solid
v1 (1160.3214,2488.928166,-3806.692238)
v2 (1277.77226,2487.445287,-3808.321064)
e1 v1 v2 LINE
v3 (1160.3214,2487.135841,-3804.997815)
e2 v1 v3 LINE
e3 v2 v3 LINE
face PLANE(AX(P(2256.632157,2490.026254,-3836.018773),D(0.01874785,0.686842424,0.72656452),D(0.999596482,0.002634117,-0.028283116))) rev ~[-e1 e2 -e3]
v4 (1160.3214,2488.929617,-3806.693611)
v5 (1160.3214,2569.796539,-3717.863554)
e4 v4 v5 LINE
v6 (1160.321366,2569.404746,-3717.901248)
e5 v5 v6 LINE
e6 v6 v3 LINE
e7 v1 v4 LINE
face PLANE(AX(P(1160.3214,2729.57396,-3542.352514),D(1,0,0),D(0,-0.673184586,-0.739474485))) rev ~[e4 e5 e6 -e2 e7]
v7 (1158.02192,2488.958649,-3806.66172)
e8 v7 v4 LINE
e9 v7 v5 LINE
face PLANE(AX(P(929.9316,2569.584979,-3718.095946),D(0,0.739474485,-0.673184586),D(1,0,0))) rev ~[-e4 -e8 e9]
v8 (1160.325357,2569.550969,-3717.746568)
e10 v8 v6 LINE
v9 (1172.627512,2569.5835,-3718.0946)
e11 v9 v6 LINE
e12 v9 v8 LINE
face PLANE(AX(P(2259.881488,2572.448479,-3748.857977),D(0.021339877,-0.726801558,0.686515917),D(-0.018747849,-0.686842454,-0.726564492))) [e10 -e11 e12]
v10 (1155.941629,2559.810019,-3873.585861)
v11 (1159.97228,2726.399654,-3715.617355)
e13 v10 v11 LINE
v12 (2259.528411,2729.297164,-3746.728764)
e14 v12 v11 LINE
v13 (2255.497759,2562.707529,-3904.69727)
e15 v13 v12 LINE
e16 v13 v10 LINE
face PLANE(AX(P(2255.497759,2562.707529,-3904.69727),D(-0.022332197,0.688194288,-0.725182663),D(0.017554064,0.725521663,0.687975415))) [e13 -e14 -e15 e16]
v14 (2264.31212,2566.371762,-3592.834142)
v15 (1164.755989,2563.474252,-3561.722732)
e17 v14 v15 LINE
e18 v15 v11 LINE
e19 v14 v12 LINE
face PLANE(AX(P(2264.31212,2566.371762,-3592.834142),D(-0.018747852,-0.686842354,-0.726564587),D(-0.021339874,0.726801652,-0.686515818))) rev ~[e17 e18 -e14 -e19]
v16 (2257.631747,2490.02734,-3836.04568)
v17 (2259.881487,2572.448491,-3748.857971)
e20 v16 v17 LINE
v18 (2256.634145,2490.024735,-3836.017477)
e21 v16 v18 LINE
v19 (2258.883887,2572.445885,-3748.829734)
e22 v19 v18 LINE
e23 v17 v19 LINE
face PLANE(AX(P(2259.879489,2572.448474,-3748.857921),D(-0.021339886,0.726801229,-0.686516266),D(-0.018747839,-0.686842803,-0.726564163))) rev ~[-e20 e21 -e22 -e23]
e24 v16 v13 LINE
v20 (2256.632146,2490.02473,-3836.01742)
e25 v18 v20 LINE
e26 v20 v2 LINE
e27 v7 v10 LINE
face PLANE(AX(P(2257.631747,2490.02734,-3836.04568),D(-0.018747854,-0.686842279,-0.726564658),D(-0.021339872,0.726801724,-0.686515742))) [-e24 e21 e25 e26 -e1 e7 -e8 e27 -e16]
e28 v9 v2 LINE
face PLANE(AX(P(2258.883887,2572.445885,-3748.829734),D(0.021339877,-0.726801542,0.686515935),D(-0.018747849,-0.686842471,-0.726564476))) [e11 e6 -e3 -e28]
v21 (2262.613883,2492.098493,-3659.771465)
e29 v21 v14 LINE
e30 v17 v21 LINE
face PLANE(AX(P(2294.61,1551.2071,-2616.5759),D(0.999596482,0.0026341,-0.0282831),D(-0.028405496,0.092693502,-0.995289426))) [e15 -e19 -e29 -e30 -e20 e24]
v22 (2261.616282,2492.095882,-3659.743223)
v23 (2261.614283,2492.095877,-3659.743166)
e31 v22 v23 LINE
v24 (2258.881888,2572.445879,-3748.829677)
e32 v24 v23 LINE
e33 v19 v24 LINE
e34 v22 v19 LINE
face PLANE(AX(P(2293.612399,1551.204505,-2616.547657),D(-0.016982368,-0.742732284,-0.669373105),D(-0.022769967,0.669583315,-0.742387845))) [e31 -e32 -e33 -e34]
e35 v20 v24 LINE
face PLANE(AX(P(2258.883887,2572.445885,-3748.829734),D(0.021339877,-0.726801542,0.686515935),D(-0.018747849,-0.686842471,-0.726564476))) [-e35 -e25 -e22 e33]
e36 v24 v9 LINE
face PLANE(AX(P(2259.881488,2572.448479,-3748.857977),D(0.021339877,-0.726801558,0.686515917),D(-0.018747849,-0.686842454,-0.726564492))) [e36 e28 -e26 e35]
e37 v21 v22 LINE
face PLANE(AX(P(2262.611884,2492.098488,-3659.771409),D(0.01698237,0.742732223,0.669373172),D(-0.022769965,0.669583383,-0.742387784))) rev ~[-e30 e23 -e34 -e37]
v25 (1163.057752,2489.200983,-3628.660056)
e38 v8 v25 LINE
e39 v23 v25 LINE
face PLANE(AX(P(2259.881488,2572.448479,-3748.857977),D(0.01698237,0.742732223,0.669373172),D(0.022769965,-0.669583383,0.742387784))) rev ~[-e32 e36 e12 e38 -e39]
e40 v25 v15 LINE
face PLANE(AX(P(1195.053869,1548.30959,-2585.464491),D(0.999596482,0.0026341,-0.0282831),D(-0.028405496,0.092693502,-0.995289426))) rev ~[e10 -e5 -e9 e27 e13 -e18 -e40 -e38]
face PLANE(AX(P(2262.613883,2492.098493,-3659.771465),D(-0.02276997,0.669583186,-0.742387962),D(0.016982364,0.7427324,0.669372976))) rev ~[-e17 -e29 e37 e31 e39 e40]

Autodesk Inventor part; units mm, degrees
sketch "Sketch1" plane through (0, 0, 0) normal (0, 0, 1) x (1, 0, 0)
  line L0 (2948.6488, 634.5525) -> (2841.4489, 559.4904)
  line L1 (2841.4489, 559.4904) -> (2956.2003, 395.6085)
  line L2 (2956.2003, 395.6085) -> (3063.4001, 470.6706)
  line L3 (1051.1773, 2444.1167) -> (976.8907, 2338.0244)
  line L4 (976.8907, 2338.0244) -> (1140.7211, 2223.3091)
  line L5 (1140.7211, 2223.3091) -> (1215.0077, 2329.4014)
  line L6 (-383.8501, 3232.1868) -> (-383.8501, 3052.6308)
  arc A0 (4065.9398, -2152.4924) -> (-383.8501, 3052.6308) centre (-4485.4868, -4958.3977) ccw
  arc A1 (1051.1773, 2444.1167) -> (-383.8501, 3232.1868) centre (-3980.604, -5017.8654) ccw
  arc A2 (2948.6488, 634.5525) -> (1215.0077, 2329.4014) centre (-4152.392, -4894.9339) ccw
  arc A3 (4300.883, -1939.8955) -> (3063.4001, 470.6706) centre (-4233.2291, -4798.0297) ccw
  arc A4 (4065.9398, -2152.4924) -> (4300.883, -1939.8955) centre (3657.2708, -1464.7499) ccw
  point P0 (0, 0)
  point P1 (4065.924, -2152.4924)
  point P2 (4065.924, -2152.4924)
  dimension "d8" = 9000
  dimension "d9" = 9000
  dimension "d10" = 9000
  dimension "d11" = 9000
  dimension "d12" = 800
ref_plane "Work Plane2" through (0, 0, -7900) normal (0, 0, 1) x (1, 0, 0)
ref_plane "Work Plane1" through (0, 0, 0) normal (0, 0, 1) x (1, 0, 0)
sketch "Sketch2" plane through (0, 0, -7900) normal (0, 0, 1) x (1, 0, 0)
  arc A0 (895.257, 3171.2695) -> (-383.8658, 4018.7524) centre (-4697.1096, -3880.3569) ccw projected
  line L0 (-383.8658, 4018.7524) -> (-383.8658, 3839.1061) projected
  arc A1 (4065.924, -2152.4924) -> (-383.8658, 3839.1061) centre (-4733.9746, -4039.7614) ccw projected
  line L1 (895.257, 3171.2695) -> (830.4728, 3059.0601) projected
  line L2 (830.4728, 3059.0601) -> (1003.6891, 2959.0536) projected
  line L3 (1068.4733, 3071.2631) -> (1003.6891, 2959.0536) projected
  arc A2 (2750.1419, 1279.62) -> (1068.4733, 3071.2631) centre (-4591.4319, -3926.2703) ccw projected
  line L4 (2750.1419, 1279.62) -> (2643.8882, 1205.2246) projected
  line L5 (2643.8882, 1205.2246) -> (2759.146, 1041.7698) projected
  line L6 (2865.5448, 1116.2711) -> (2759.146, 1041.7698) projected
  arc A3 (4310.9102, -1926.005) -> (2865.5448, 1116.2711) centre (-4397.3898, -4198.7812) ccw projected
  arc A4 (4065.924, -2152.4924) -> (4310.9102, -1926.005) centre (3657.2831, -1464.7333) ccw
  point P0 (0, 0)
  dimension "d7" = 800
loft "Loft1" add profiles "Sketch1", "Sketch2"
ref_plane "Work Plane3" through (2500, 0, 0) normal (1, 0, 0) x (0, 1, 0)
sketch "Sketch3" plane through (2500, 0, 0) normal (1, 0, 0) x (0, 1, 0)
  line L0 (2569.5835, -3718.0946) -> (1551.2045, -2616.5476)
  line L1 (1551.2045, -2616.5476) -> (1738.7871, -4630.7013)
  line L2 (1738.7871, -4630.7013) -> (2569.5835, -3718.0946)
  line L3 (4228.9662, 279.606) -> (-2269.9695, 279.606)
  line L4 (-2269.9695, 279.606) -> (-2269.9695, -8192.2559)
  line L5 (-2269.9695, -8192.2559) -> (4228.9662, -8192.2559)
  line L6 (4228.9662, -8192.2559) -> (4228.9662, 279.606)
  point P0 (0, 0)
extrude "Extrusion1" cut sketch "Sketch3" along normal through all both and the other way through all
ref_plane "Work Plane4" through (1945.737, 1551.2045, -2616.5476) normal (0, -0.9956912, -0.0927309) x (1, 0, 0)
sketch "Sketch5" plane through (1945.737, 1551.2045, -2616.5476) normal (0, -0.9956912, -0.0927309) x (1, 0, 0)
  line L0 (347.8734, 0) -> (290.3896, -2022.8698)
  point P0 (-1945.737, 2749.1181)
ref_plane "Work Plane5" through (2293.6104, 1551.2045, -2616.5476) normal (-0.6425282, -0.7644369, -0.052856) x (-0.0284055, 0.0926935, -0.9952894)
sketch "Sketch6" plane through (2293.6104, 1551.2045, -2616.5476) normal (-0.6425282, -0.7644369, -0.052856) x (-0.0284055, 0.0926935, -0.9952894)
  line L0 (-1061.9028, -2252.9112) -> (2197.0944, -2252.9112)
  line L1 (2197.0944, -2252.9112) -> (2197.0944, 343.7273)
  line L2 (2197.0944, 343.7273) -> (-1061.9028, 343.7273)
  line L3 (-1061.9028, 343.7273) -> (-1061.9028, -2252.9112)
  point P0 (-2682.8576, -979.2829)
extrude "Extrusion2" cut sketch "Sketch6" against normal through all
ref_plane "Work Plane6" through (2293.6104, 1551.2045, -2616.5476) normal (-0.9995965, -0.0026341, 0.0282831) x (-0.0284055, 0.0926935, -0.9952894)
sketch "Sketch7" plane through (2293.6104, 1551.2045, -2616.5476) normal (-0.6425282, -0.7644369, -0.052856) x (-0.0284055, 0.0926935, -0.9952894)
  line L0 (0, 0) -> (1222.5973, -1418.5767) projected
  line L1 (1222.5973, -1418.5767) -> (2023.6864, 0) projected
  point P0 (-2682.8576, -979.2829)
sketch "Sketch8" plane through (2293.6104, 1551.2045, -2616.5476) normal (-0.9995965, -0.0026341, 0.0282831) x (-0.0284055, 0.0926935, -0.9952894)
  line L0 (0, 0) -> (1222.5973, -911.8435) projected
  spline S0 degree 4 poles (2023.6864, 0) (1891.4174, -0.0605) (1759.1485, -0.1112) (1626.8795, -0.1518) (1361.543, -0.2126) (1228.4756, -0.2325) (1095.4081, -0.2417) (831.8573, -0.2379) (701.374, -0.2253) (570.8907, -0.2017) (330.3055, -0.1374) (220.2037, -0.0999) (110.1018, -0.0542) (0, 0) knots 0 0 0 0 0 0.261442 0.261442 0.261442 0.524462 0.524462 0.524462 0.782374 0.782374 0.782374 1 1 1 1 1 projected
  line L1 (1222.5973, -911.8435) -> (2023.6864, 0) projected
  point P0 (-2682.8576, 1301.8858)
sketch "Sketch9" plane through (2293.6104, 1551.2045, -2616.5476) normal (-0.9995965, -0.0026341, 0.0282831) x (-0.0284055, 0.0926935, -0.9952894)
  line L0 (1222.5973, -911.8435) -> (0, 0) projected
  line L1 (2023.6864, 0) -> (1222.5973, -911.8435) projected
  spline S0 degree 4 poles (0, 0) (253.1862, 0) (506.3724, 0) (759.5586, 0) (1265.4802, 0) (1518.2156, 0) (1770.951, 0) (2023.6864, 0) knots 0 0 0 0 0 0.500446 0.500446 0.500446 1 1 1 1 1 projected
  point P0 (-2682.8576, 1301.8858)
extrude "Extrusion3" add sketch "Sketch9" against normal blind 1
sketch "Sketch10" plane through (2294.61, 1551.2071, -2616.5759) normal (0.9995965, 0.0026341, -0.0282831) x (-0.0284055, 0.0926935, -0.9952894)
  line L0 (1222.5973, 911.8435) -> (2011.6459, 13.7052) projected
  line L1 (1222.5973, 911.8435) -> (1126.4049, 840.1008)
  line L2 (0, 0) -> (1222.5973, 911.8435) projected
  line L3 (1222.5973, 911.8435) -> (1301.7983, 821.6925)
  line L4 (1301.7983, 821.6925) -> (1376.9241, 887.6934)
  line L5 (1376.9241, 887.6934) -> (1235.027, 1068.2138)
  line L6 (1126.4049, 840.1008) -> (1066.6193, 920.2612)
  line L7 (1066.6193, 920.2612) -> (1235.027, 1068.2138)
  point P0 (-2682.8576, -1301.8858)
  dimension "d31" = 120
  dimension "d32" = 120
  dimension "d33" = 100
  dimension "d34" = 100
extrude "Extrusion5" add sketch "Sketch10" against normal blind 1100
sketch "Sketch16" plane through (2294.61, 1551.2071, -2616.5759) normal (0.9995965, 0.0026341, -0.0282831) x (-0.0284055, 0.0926935, -0.9952894)
  line L0 (0, 0) -> (1126.4049, 840.1008) projected
  line L1 (1020.1978, 760.8889) -> (1222.5973, 911.8435)
  line L2 (0, 0) -> (-179.2361, -133.6787)
  line L3 (-179.2361, -133.6787) -> (2478.6059, -144.4888)
  line L4 (2478.6059, -144.4888) -> (2023.6864, 0)
  line L5 (1305.5559, 824.9938) -> (1226.6196, 914.8434)
  line L6 (1222.5973, 911.8435) -> (1226.6196, 914.8434)
  point P0 (-2682.8576, -1301.8858)
extrude "Extrusion6" cut sketch "Sketch8" along normal blind 2000
sketch "Sketch17" plane through (2256.6322, 2490.0248, -3836.0174) normal (0.0213399, -0.7268016, 0.6865159) x (0.9995965, 0.0026341, -0.0282831)
  line L0 (0, 0) -> (-979.255, 0) projected
  line L1 (-1518.239, 0) -> (548.3239, 0)
  line L2 (548.3239, 0) -> (548.3239, -1298.4887)
  line L3 (548.3239, -1298.4887) -> (-1518.239, -1298.4887)
  line L4 (-1518.239, -1298.4887) -> (-1518.239, 0)
  point P0 (-2370.775, 1034.5522)
  point P1 (-1213.4732, 0)
  point P2 (-1999, 0)
extrude "Extrusion7" cut sketch "Sketch17" along normal mid plane 5000
sketch "Sketch18" plane through (2294.61, 1551.2071, -2616.5759) normal (0.9995965, 0.0026341, -0.0282831) x (-0.0284055, 0.0926935, -0.9952894)
  line L0 (1126.4049, 840.1008) -> (1222.5973, 911.8435) projected
  line L1 (1301.7983, 821.6925) -> (366.6688, 0.1458) projected
  spline S0 degree 4 poles (366.6688, 0.1458) (275.0016, 0.1179) (183.3344, 0.0844) (91.6672, 0.0451) (0, 0) knots 0 0 0 0 0 1 1 1 1 1 projected
  line L2 (0, 0) -> (1126.4049, 840.1008) projected
  line L3 (1126.4049, 840.1008) -> (1222.5973, 911.8435) projected
  line L4 (1222.5973, 911.8435) -> (1301.7983, 821.6925) projected
  point P0 (-2682.8576, -1301.8858)
  point P1 (1126.4049, 840.1008)
extrude "Extrusion8" cut sketch "Sketch18" along normal mid plane 5000
sketch "Sketch19" plane through (1945.737, 1551.2045, -2616.5476) normal (0, -0.9956912, -0.0927309) x (1, 0, 0)
  line L0 (407.6375, 227.4777) -> (-99.9449, 227.4777)
  line L1 (-99.9449, 227.4777) -> (-99.9449, -459.2513)
  line L2 (-99.9449, -459.2513) -> (407.6375, -459.2513)
  line L3 (407.6375, -459.2513) -> (407.6375, 227.4777)
  point P0 (-1945.737, 2749.1181)
extrude "Extrusion9" cut sketch "Sketch19" along normal mid plane 100
sketch "Sketch20" plane through (929.9316, 2569.5835, -3718.0946) normal (0, 0.7394745, -0.6731846) x (1, 0, 0)
  line L0 (3.9942, -0.4392) -> (230.3898, -0.0226) projected
  line L1 (-207.8079, -0.0226) -> (-207.8079, 338.0495)
  line L2 (-207.8079, 338.0495) -> (230.3898, 338.0495)
  line L3 (230.3898, 338.0495) -> (230.3898, -0.0226)
  line L4 (-207.8079, -0.0226) -> (-207.8079, -237.6599)
  line L5 (-207.8079, -237.6599) -> (230.3898, -237.6599)
  line L6 (230.3898, -237.6599) -> (230.3898, 129.1543)
  point P0 (-929.9316, -1019.6322)
extrude "Extrusion10" cut sketch "Sketch20" against normal blind 1100
properties part number "panel_block_02" material "Wood (Maple)"
